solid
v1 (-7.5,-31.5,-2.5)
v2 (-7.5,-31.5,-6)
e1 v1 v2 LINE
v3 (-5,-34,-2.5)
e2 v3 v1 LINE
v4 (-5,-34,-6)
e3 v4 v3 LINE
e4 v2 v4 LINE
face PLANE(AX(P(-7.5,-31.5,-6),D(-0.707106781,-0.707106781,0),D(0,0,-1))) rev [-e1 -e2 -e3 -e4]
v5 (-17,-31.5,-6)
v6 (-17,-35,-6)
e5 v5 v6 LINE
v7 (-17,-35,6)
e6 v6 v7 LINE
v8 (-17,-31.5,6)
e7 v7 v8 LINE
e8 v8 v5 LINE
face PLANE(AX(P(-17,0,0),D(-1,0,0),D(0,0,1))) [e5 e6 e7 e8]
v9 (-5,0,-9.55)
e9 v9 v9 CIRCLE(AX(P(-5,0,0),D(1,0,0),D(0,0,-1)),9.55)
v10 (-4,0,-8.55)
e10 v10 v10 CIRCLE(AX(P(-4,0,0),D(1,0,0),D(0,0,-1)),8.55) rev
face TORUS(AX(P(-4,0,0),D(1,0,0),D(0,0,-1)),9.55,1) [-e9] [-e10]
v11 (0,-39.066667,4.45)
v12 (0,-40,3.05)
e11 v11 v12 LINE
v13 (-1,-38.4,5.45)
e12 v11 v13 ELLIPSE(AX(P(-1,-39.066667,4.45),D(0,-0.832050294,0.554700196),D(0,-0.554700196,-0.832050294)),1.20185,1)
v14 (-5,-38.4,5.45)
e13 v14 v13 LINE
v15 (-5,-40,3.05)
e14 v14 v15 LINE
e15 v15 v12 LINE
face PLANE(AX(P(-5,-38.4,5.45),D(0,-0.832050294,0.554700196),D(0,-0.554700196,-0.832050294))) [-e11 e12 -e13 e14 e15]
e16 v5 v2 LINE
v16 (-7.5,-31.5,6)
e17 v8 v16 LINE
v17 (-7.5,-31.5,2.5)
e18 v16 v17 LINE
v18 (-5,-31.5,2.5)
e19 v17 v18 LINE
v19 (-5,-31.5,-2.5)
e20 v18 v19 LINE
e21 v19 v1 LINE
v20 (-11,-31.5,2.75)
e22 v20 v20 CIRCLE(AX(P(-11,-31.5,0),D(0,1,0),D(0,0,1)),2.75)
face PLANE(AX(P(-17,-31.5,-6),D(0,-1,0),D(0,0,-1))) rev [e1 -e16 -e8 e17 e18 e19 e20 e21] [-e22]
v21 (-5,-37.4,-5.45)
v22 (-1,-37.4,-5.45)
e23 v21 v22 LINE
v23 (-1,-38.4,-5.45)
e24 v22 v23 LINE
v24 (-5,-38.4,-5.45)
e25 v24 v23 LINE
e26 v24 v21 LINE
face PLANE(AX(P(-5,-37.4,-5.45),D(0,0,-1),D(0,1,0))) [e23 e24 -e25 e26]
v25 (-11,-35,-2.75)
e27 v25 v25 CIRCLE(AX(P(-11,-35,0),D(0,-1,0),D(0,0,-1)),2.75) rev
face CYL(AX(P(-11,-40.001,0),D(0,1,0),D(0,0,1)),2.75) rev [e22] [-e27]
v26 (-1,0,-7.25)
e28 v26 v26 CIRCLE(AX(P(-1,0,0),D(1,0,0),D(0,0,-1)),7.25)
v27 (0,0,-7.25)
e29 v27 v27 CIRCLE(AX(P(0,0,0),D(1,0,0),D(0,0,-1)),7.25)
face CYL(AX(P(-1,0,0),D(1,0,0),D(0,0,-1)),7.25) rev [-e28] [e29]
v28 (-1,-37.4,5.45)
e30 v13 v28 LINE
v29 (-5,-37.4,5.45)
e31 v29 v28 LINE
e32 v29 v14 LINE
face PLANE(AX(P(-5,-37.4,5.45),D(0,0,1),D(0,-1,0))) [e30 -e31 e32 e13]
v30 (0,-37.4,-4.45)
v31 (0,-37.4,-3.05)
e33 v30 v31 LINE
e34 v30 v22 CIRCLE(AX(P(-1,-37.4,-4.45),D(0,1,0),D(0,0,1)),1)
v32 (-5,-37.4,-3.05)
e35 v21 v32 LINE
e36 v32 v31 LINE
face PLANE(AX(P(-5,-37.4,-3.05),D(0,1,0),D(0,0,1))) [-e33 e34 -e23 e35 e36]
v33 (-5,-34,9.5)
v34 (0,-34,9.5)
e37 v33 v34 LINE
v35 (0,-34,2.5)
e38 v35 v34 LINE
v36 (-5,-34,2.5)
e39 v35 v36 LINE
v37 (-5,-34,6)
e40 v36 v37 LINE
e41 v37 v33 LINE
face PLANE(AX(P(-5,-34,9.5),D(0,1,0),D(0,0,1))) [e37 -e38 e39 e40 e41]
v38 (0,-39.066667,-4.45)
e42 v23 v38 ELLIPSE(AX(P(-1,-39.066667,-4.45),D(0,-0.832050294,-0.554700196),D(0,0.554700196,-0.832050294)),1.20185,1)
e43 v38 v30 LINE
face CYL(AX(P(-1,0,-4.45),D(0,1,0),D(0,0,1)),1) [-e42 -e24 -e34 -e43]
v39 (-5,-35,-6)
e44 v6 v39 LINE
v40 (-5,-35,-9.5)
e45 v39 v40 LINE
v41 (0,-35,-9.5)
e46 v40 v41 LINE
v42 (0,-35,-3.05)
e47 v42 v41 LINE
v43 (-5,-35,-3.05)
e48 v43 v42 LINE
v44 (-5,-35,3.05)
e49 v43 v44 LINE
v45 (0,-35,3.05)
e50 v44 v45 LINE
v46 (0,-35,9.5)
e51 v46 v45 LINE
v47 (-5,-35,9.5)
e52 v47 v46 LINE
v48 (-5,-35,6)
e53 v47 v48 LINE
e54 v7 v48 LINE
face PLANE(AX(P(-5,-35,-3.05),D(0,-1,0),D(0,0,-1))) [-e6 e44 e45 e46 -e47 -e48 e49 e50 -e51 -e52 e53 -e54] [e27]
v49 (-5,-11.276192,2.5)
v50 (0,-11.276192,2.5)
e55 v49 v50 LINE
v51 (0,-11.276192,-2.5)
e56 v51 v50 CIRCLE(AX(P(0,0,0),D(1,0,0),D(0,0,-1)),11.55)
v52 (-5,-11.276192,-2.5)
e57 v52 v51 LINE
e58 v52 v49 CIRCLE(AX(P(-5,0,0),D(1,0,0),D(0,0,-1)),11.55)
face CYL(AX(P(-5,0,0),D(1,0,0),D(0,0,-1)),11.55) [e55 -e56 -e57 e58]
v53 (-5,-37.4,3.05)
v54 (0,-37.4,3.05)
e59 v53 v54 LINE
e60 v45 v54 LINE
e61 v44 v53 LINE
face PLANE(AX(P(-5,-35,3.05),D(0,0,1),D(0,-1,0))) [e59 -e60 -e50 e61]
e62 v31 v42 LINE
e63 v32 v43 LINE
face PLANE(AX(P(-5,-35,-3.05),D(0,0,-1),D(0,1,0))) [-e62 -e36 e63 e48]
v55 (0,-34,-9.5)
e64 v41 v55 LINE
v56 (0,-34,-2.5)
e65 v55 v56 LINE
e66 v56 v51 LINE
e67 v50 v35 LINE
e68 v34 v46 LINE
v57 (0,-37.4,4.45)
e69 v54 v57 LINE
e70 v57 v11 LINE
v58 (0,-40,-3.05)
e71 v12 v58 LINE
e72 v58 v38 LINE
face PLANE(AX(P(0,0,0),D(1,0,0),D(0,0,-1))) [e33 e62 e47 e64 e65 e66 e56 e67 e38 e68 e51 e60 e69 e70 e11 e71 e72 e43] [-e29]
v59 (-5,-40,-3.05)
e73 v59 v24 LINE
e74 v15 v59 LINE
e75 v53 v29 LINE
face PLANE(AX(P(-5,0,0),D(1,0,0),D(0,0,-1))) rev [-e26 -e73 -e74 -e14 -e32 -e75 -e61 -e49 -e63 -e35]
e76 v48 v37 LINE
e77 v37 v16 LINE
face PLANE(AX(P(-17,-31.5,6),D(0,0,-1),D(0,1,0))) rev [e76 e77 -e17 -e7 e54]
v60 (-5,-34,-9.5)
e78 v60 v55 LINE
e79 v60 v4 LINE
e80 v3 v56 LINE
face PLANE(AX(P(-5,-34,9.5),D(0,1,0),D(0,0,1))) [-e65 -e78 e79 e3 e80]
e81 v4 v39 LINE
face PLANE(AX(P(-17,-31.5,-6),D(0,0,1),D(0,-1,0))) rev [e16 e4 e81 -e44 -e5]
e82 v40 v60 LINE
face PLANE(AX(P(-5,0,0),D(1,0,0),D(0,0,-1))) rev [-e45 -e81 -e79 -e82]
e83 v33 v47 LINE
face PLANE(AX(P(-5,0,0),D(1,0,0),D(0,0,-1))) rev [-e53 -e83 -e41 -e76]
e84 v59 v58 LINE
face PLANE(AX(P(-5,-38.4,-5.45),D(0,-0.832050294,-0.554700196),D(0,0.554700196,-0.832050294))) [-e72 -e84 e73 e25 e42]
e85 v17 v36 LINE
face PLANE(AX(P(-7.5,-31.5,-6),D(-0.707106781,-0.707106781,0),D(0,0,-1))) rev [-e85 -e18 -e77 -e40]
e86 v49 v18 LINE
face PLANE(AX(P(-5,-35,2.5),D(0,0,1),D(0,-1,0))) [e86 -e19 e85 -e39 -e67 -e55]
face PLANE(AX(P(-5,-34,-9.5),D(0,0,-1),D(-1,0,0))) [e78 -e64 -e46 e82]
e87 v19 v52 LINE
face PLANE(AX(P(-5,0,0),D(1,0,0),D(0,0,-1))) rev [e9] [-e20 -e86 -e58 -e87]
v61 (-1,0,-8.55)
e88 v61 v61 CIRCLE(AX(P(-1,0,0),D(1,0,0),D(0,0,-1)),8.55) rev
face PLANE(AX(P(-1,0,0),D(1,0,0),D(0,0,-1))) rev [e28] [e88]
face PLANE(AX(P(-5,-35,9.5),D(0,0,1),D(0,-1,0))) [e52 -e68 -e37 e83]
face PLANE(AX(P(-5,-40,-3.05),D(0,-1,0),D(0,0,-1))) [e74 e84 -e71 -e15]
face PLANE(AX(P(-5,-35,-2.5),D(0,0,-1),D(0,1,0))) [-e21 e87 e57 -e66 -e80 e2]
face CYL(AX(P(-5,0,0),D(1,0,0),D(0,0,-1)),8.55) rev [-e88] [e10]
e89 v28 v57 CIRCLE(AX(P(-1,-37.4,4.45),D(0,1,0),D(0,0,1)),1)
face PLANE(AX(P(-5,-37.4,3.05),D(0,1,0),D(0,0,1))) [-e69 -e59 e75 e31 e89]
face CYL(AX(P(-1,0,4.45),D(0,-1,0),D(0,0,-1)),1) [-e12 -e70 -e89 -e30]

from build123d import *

# Parameters (mm, degrees)
SKETCH1_R            = 11.55
SKETCH1_R_2          = 8.55
BOSS_EXTRUDE1_DEPTH  = 5
SKETCH2_W            = 5
SKETCH2_H            = 23.723808267
BOSS_EXTRUDE2_DEPTH  = 5
BOSS_EXTRUDE3_DEPTH  = 5
FILLET1_R            = 1
SKETCH38_W           = 12
SKETCH38_H           = 3.5
BOSS_EXTRUDE28_DEPTH = 12
CUT_EXTRUDE3_REACH   = 49.704
SKETCH39_R           = 2.75
CHAMFER1_SIZE        = 2.5
FILLET3_R            = 1
SKETCH1_3_R          = 8.55
SKETCH1_3_R_2        = 7.25
BOSS_EXTRUDE29_DEPTH = 1


with BuildPart() as part:
    # Sketch1 → Boss-Extrude1 (new body)
    with BuildSketch(Plane(origin=(0, 0, 0), x_dir=(0, 0, -1), z_dir=(1, 0, 0))):
        Circle(SKETCH1_R)
        Circle(SKETCH1_R_2, mode=Mode.SUBTRACT)
    extrude(amount=-BOSS_EXTRUDE1_DEPTH)

    # Sketch2 → Boss-Extrude2 (add)
    with BuildSketch(Plane(origin=(0, 0, 0), x_dir=(0, 0, -1), z_dir=(1, 0, 0))):
        with Locations((0, -23.138095867)):
            Rectangle(SKETCH2_W, SKETCH2_H)
    extrude(amount=-BOSS_EXTRUDE2_DEPTH)

    # Sketch3 → Boss-Extrude3 (add)
    with BuildSketch(Plane(origin=(0, 0, 0), x_dir=(0, 0, -1), z_dir=(1, 0, 0))):
        Polygon((-9.5, -35), (-9.5, -34), (9.5, -34), (9.5, -35), (3.05, -35), (3.05, -37.4), (5.45, -37.4), (5.45, -38.4), (3.05, -40), (-3.05, -40), (-5.45, -38.4), (-5.45, -37.4), (-3.05, -37.4), (-3.05, -35), align=None)
    extrude(amount=-BOSS_EXTRUDE3_DEPTH)

    # Fillet1
    fillet1_edges = [part.edges().sort_by_distance(p)[0] for p in [
        (0, -37.9, 5.45),
        (0, -37.9, -5.45),
    ]]
    fillet(fillet1_edges, radius=FILLET1_R)

    # Sketch38 → Boss-Extrude28 (add)
    with BuildSketch(Plane.ZY.offset(5)):
        with Locations((0, -33.25)):
            Rectangle(SKETCH38_W, SKETCH38_H)
    extrude(amount=BOSS_EXTRUDE28_DEPTH)

    # Sketch39 → Cut-Extrude3 (cut, up to next)
    with BuildSketch(Plane(origin=(0, -31.5, 0), x_dir=(1, 0, 0), z_dir=(0, 1, 0)), mode=Mode.PRIVATE) as cut_extrude3_sk1:
        with Locations(Location((-11, 0, 0), (0, 0, 270))):
            Circle(SKETCH39_R)
    cut_extrude3_tool1 = extrude(cut_extrude3_sk1.sketch, amount=-CUT_EXTRUDE3_REACH, mode=Mode.PRIVATE) & part.part
    add(cut_extrude3_tool1.solids().sort_by_distance((-11, -31.5, 0))[0], mode=Mode.SUBTRACT)

    # Chamfer1
    chamfer1_edges = [part.edges().sort_by_distance(p)[0] for p in [
        (-5, -31.5, 4.25),
        (-5, -31.5, -4.25),
    ]]
    chamfer(chamfer1_edges, length=CHAMFER1_SIZE - 0.0001)  # a hair under: the kernel refuses the full size

    # Fillet3
    fillet3_edges = [part.edges().sort_by_distance(p)[0] for p in [
        (-5, 0, 8.55),
    ]]
    fillet(fillet3_edges, radius=FILLET3_R)

    # Sketch1<3> → Boss-Extrude29 (add)
    with BuildSketch(Plane(origin=(0, 0, 0), x_dir=(0, 0, -1), z_dir=(1, 0, 0))):
        Circle(SKETCH1_3_R)
        Circle(SKETCH1_3_R_2, mode=Mode.SUBTRACT)
    extrude(amount=-BOSS_EXTRUDE29_DEPTH)


solid = part.part
